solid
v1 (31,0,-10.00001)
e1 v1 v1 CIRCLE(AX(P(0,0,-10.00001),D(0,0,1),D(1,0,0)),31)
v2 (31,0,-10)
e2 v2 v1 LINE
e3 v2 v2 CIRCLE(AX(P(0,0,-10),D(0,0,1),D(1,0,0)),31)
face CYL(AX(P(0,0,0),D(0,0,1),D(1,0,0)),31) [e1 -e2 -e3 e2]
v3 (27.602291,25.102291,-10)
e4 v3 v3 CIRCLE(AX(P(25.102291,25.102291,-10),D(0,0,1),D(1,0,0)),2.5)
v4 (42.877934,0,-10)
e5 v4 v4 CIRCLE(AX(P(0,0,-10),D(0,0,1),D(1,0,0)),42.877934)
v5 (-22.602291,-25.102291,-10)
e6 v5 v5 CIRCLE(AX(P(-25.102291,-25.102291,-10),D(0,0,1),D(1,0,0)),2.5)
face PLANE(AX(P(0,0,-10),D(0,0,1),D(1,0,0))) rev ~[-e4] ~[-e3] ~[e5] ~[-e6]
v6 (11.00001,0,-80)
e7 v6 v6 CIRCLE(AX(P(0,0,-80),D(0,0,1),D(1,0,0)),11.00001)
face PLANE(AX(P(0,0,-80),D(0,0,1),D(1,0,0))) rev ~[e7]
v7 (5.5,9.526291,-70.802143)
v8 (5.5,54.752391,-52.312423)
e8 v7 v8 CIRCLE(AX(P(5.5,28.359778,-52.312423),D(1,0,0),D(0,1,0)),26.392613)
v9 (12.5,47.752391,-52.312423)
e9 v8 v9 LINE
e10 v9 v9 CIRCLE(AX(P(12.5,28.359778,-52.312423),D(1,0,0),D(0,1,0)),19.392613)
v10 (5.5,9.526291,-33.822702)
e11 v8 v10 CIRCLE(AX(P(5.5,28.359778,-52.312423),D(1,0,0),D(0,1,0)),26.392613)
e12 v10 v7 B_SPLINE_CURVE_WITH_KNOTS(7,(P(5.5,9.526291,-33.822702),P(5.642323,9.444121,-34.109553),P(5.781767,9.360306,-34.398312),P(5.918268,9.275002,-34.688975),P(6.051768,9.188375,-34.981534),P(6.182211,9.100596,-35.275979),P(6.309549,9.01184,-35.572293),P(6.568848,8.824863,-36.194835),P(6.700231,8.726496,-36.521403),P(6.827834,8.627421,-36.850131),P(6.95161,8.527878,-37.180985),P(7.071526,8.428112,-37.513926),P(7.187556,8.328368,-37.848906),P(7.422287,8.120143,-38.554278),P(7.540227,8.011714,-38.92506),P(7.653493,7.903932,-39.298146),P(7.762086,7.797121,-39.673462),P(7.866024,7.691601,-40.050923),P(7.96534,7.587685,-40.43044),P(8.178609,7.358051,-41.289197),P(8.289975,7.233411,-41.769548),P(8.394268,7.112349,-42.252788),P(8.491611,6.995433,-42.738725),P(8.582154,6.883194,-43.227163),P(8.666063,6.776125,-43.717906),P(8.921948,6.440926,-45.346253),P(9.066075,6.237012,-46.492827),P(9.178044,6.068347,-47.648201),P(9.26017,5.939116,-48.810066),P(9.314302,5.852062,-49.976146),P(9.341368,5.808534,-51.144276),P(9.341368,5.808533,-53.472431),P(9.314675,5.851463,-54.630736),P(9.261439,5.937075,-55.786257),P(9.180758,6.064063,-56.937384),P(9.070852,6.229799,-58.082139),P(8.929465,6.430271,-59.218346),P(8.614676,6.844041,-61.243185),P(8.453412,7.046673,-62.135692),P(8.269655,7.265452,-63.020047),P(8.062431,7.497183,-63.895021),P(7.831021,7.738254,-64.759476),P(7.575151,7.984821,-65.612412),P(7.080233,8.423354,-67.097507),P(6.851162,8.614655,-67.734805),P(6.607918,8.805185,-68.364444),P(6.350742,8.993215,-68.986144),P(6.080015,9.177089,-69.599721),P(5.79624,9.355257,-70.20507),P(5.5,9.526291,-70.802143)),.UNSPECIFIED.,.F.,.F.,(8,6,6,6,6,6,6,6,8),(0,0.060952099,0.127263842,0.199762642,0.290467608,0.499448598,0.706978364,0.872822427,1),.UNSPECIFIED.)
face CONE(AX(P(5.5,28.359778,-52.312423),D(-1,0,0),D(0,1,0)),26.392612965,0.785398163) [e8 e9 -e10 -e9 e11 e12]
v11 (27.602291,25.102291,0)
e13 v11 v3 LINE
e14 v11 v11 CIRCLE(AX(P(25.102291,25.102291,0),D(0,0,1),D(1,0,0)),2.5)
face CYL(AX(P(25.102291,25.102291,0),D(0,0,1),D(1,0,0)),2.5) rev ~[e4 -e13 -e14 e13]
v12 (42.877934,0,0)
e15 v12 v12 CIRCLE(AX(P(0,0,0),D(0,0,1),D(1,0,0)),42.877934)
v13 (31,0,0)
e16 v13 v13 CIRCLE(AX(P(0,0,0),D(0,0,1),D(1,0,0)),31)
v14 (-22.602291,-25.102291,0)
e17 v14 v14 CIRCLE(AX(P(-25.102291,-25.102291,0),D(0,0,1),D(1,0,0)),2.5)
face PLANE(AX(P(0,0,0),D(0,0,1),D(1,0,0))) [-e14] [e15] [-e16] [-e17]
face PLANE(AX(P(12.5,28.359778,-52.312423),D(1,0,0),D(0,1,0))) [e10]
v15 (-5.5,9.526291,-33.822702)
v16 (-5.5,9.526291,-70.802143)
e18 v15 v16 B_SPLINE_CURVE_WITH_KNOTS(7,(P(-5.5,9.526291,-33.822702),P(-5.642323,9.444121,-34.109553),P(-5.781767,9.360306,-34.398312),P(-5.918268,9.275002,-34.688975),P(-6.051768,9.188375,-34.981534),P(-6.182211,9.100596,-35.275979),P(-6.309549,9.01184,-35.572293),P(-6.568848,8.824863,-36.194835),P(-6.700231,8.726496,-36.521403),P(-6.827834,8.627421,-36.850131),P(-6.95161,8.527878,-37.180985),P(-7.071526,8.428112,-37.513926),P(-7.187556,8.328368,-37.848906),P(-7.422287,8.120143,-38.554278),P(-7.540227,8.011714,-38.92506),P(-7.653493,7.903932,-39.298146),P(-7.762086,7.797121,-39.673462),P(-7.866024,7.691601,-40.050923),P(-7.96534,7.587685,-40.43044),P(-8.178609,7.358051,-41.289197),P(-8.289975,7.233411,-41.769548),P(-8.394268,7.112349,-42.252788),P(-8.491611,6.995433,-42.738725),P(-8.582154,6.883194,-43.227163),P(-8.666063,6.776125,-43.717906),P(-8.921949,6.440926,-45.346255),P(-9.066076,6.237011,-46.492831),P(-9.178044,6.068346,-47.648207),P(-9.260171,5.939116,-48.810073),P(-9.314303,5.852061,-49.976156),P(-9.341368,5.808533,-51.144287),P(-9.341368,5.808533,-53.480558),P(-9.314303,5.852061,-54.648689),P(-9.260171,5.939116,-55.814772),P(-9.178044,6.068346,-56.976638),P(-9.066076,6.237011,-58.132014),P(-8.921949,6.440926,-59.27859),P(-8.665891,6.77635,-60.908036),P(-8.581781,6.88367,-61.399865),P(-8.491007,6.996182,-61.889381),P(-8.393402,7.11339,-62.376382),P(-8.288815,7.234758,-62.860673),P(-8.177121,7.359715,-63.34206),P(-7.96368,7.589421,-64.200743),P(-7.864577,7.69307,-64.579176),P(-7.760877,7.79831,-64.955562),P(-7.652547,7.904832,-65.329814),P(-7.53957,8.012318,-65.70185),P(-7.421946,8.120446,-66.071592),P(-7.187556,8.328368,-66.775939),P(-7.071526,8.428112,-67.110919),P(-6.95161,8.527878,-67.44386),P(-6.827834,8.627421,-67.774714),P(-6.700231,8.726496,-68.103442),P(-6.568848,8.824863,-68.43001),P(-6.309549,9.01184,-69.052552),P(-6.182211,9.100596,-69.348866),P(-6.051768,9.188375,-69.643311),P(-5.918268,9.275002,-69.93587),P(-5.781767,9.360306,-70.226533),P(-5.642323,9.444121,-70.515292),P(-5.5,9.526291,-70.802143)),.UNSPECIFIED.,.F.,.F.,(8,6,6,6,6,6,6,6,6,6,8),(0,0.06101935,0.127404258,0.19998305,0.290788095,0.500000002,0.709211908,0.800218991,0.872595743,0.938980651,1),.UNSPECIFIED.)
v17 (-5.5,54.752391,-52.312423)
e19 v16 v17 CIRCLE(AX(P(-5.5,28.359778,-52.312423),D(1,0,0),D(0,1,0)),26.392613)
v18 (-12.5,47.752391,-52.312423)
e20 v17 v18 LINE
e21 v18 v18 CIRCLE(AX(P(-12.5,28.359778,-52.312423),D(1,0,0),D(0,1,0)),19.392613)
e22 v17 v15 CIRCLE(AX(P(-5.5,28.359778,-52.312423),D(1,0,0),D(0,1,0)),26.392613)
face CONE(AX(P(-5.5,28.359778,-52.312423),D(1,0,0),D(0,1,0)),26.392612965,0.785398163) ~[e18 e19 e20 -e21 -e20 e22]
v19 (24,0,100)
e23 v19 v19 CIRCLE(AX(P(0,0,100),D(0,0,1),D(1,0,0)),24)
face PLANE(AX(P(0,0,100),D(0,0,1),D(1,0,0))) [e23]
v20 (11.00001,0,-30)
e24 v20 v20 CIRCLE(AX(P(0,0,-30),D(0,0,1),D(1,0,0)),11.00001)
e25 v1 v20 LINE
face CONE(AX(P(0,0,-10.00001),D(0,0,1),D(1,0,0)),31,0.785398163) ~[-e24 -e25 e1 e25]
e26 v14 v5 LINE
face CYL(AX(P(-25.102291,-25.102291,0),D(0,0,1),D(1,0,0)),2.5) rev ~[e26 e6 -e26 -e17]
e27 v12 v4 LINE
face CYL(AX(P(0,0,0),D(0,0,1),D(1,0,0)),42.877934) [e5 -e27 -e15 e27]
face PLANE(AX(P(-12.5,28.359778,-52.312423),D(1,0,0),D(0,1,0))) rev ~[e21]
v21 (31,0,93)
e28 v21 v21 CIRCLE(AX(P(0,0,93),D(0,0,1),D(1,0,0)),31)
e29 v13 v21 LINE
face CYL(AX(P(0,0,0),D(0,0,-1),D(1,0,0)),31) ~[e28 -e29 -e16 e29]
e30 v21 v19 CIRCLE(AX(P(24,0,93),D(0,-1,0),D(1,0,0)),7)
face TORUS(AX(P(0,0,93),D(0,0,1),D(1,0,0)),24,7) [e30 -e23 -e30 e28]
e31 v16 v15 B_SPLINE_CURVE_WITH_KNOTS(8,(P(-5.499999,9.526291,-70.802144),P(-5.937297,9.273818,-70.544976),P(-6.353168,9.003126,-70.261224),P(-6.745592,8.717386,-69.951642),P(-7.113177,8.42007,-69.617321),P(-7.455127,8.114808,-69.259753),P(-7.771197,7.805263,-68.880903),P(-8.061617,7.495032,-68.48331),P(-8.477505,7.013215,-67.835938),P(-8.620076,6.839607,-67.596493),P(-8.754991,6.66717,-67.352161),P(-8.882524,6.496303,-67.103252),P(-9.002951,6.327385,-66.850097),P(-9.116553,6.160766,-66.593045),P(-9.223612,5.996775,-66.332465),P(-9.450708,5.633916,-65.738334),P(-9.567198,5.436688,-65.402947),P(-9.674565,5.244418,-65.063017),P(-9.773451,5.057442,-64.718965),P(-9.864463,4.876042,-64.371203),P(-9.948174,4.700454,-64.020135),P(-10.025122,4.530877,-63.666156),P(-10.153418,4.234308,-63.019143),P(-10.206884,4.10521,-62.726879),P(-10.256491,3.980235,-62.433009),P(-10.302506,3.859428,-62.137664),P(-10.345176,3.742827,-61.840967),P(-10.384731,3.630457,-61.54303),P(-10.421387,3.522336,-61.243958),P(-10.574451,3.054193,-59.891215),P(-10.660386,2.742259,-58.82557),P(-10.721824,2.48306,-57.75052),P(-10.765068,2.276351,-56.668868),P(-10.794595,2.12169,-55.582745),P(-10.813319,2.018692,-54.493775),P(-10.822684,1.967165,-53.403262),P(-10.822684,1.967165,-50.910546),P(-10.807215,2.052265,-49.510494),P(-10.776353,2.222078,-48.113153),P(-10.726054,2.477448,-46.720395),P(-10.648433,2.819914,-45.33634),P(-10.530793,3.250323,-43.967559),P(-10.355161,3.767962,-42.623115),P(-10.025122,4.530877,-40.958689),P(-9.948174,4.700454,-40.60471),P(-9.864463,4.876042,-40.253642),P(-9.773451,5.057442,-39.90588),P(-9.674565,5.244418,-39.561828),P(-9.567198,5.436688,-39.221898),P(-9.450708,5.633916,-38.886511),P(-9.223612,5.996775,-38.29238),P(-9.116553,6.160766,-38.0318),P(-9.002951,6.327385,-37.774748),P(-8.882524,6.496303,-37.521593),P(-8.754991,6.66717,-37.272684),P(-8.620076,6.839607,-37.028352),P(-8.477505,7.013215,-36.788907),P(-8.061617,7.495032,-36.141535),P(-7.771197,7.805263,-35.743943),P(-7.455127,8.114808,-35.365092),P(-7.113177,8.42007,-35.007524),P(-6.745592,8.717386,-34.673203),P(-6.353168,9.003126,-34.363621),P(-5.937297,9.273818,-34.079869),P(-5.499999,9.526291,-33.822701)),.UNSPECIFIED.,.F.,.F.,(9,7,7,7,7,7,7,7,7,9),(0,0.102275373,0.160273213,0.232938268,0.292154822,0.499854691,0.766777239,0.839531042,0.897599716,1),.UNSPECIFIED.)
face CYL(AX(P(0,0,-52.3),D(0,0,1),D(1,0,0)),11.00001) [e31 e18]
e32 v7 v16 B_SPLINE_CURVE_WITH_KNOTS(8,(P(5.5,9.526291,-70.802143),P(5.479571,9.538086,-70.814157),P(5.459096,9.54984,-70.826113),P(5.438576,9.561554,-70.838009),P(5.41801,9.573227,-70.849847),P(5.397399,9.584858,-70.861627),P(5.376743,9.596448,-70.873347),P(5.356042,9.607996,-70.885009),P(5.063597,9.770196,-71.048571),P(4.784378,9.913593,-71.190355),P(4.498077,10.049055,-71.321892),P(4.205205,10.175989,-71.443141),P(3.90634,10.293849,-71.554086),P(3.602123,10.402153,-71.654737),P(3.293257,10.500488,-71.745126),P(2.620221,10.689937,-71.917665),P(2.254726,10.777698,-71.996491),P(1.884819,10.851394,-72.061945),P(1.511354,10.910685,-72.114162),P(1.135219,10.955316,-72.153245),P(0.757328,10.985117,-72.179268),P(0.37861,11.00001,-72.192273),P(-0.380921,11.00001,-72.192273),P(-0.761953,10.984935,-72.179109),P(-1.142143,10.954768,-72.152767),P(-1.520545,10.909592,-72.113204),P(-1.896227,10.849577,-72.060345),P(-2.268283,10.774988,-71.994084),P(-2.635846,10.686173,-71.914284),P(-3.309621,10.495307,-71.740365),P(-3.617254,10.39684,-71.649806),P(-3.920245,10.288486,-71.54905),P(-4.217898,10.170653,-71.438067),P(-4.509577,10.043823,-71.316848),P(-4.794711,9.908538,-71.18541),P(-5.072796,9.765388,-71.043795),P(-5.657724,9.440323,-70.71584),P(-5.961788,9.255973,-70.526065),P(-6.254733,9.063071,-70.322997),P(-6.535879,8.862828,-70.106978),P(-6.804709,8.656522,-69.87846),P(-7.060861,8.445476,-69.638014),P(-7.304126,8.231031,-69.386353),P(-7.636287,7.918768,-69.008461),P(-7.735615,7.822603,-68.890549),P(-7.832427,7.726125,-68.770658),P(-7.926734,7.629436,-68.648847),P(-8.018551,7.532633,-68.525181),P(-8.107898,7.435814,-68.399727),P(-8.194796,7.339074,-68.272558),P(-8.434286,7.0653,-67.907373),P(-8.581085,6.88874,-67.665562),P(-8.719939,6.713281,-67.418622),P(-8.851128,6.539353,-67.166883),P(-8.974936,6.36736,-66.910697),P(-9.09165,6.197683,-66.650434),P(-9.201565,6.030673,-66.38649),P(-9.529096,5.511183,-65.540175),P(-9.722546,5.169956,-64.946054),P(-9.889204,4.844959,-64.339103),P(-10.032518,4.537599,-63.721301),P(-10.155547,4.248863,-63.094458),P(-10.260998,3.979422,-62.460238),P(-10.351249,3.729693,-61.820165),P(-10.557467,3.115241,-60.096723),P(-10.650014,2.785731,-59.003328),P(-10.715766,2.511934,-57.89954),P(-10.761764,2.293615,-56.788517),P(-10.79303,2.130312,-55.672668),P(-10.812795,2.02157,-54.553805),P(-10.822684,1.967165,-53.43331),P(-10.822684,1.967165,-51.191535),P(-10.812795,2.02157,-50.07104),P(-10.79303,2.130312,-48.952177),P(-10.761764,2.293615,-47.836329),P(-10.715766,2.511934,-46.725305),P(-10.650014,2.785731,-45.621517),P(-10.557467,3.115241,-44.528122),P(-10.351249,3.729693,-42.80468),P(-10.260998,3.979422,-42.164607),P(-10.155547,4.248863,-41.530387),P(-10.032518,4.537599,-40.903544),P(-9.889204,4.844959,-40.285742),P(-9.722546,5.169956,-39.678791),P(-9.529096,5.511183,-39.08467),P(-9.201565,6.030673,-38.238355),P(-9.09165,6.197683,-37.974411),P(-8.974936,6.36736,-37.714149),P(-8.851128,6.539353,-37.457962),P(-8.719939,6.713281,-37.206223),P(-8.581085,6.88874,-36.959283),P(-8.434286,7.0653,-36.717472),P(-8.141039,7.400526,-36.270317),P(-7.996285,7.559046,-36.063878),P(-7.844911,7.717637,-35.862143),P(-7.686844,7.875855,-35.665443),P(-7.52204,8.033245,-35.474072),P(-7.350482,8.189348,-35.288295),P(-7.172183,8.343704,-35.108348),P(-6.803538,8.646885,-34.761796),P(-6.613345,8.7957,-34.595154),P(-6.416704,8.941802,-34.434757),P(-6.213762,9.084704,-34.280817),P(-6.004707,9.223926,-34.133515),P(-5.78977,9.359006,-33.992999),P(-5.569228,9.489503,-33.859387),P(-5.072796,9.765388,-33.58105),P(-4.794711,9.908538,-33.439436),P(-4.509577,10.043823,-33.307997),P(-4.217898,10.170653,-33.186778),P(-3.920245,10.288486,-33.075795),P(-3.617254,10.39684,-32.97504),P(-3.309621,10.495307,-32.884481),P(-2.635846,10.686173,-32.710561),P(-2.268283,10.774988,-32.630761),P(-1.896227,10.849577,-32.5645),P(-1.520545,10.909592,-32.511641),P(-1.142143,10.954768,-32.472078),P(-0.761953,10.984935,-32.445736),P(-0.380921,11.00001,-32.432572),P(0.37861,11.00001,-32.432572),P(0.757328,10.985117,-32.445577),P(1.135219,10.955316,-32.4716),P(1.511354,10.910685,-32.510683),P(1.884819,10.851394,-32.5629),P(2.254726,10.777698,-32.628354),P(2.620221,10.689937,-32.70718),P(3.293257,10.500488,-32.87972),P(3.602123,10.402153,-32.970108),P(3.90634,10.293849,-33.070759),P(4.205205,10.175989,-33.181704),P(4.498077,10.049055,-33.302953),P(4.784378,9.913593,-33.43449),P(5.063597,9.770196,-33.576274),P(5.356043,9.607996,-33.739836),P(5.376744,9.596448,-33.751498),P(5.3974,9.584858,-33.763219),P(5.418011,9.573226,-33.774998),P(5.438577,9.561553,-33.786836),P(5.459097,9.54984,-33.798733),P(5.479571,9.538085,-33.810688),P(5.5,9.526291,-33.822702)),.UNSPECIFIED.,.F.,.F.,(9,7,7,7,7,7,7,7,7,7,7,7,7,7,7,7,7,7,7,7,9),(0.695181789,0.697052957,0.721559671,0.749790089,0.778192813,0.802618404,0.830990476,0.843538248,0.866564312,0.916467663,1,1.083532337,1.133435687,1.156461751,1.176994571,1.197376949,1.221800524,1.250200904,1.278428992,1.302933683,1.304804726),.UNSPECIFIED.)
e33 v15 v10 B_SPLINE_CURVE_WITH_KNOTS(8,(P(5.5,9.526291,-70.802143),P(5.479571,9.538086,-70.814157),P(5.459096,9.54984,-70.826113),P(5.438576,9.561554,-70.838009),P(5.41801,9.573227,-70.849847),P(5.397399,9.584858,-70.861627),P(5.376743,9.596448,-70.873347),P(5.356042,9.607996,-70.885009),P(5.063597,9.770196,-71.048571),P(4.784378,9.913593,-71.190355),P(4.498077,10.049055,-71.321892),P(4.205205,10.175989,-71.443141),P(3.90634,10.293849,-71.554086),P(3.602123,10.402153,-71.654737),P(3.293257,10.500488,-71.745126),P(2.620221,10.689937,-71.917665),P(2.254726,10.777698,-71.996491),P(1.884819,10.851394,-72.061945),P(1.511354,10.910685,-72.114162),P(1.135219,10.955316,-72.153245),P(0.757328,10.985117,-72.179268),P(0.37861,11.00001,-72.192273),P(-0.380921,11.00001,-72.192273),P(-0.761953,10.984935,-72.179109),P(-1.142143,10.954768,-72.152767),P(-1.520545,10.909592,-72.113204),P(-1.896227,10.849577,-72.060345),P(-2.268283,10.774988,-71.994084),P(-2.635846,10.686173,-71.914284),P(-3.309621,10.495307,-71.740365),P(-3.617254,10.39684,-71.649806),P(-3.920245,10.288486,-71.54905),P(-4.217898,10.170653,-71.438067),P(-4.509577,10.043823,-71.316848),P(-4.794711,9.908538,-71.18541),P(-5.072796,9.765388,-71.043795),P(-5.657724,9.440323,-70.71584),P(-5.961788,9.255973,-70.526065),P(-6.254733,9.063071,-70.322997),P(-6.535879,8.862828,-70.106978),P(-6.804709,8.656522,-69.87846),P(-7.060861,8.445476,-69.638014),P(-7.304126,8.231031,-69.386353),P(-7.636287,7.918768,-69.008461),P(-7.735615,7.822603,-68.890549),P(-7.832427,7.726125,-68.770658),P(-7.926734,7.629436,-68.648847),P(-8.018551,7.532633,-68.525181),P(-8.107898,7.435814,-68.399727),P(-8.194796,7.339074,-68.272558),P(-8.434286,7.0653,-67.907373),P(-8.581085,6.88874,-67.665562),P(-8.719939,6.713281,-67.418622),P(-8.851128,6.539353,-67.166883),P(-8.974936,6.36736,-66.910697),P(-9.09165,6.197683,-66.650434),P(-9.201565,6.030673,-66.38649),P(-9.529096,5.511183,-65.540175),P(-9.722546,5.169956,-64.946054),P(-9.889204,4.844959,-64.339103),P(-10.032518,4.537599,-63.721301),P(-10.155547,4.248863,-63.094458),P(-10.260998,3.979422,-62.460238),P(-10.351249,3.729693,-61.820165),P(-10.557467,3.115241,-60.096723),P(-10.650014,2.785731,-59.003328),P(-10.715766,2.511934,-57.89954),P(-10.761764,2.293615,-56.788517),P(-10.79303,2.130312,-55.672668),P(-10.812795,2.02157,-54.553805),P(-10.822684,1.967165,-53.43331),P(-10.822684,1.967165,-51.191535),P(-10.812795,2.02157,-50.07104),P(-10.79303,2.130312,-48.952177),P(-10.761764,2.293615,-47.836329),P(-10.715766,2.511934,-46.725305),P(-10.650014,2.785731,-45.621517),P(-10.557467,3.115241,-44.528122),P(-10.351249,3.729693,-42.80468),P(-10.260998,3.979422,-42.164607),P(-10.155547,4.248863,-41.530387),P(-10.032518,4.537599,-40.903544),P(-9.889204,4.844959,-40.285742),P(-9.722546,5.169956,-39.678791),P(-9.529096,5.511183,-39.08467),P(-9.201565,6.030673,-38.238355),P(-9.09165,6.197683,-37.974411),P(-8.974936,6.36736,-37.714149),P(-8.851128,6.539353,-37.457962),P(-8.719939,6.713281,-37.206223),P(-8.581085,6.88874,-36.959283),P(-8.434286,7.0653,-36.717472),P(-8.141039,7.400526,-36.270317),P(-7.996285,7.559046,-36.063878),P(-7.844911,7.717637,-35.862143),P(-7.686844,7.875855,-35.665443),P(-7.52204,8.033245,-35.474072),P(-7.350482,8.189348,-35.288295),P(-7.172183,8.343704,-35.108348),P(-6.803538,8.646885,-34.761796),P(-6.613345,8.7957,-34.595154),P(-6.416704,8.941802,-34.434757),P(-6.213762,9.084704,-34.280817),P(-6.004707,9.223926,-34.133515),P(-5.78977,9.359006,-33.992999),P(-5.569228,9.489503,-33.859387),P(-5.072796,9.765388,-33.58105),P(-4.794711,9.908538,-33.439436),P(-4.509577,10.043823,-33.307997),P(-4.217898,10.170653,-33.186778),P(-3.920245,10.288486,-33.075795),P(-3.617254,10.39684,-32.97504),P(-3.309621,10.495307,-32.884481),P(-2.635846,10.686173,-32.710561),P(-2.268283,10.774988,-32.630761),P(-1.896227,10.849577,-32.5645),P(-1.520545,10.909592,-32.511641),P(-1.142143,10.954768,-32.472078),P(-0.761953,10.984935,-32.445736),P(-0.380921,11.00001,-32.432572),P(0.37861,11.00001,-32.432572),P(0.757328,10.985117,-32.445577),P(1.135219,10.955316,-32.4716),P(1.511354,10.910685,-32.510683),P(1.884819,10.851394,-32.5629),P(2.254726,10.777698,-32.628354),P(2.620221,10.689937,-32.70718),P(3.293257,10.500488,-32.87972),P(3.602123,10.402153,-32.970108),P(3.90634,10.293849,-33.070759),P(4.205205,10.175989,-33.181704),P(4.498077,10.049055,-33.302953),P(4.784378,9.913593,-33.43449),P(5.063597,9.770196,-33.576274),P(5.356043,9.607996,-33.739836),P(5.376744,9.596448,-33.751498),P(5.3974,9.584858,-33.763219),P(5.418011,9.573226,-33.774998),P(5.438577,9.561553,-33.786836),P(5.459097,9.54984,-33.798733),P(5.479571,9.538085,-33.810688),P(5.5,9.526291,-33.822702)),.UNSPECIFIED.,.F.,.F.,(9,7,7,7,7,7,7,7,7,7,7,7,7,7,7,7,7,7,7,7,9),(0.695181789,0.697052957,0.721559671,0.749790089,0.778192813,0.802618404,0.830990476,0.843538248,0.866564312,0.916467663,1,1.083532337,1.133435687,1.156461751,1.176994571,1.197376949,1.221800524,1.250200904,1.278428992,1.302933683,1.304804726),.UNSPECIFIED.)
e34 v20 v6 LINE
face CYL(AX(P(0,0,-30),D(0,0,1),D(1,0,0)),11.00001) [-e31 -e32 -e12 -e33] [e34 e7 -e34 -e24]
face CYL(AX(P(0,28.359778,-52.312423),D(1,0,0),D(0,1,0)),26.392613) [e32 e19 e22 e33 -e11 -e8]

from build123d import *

# Parameters (mm, degrees)
F0_R          = 31
F0_R_2        = 11.0794827648
F1_DEPTH      = 100
F2_R          = 7
F0_R_3        = 42.8779340108
F0_R_4        = 2.5
F3_DEPTH      = 10
F4_DEPTH      = 30
F5_DEPTH      = 30
F6_SIZE       = 19.99999
F7_DEPTH      = 50
F8_R          = 26.3926129655
F9_DEPTH      = 12.5
F10_S5_R      = 11.00001
F10_T6_DEPTH  = 39
F10_S11_R     = 11.00001
F10_T12_DEPTH = 39


# Not quite as in the source:
# - a fillet or chamfer that OpenCascade refuses, or shapes differently, is made with other operations: its cross-section is extruded or revolved along the edge and cut away or added
# - a fillet or chamfer is up to 0.001 mm smaller than in the source, because OpenCascade refuses the exact size


with BuildPart() as f1:
    # F0 (on Top) → F1 (new body)
    with BuildSketch(Plane.XY):
        Circle(F0_R)
        Circle(F0_R_2, mode=Mode.SUBTRACT)
        Circle(F0_R_2)
    extrude(amount=F1_DEPTH)

    # F2
    f2_edges = [f1.edges().sort_by_distance(p)[0] for p in [
        (-31, 0, 100),
    ]]
    fillet(f2_edges, radius=F2_R)

    # F0 (on Top) → F3 (join)
    with BuildSketch(Plane.XY):
        Circle(F0_R_3)
        with Locations((-25.1022907321, -25.1022907321)):
            Circle(F0_R_4, mode=Mode.SUBTRACT)
        Circle(F0_R, mode=Mode.SUBTRACT)
        with Locations((25.1022907321, 25.1022907321)):
            Circle(F0_R_4, mode=Mode.SUBTRACT)
    extrude(amount=-F3_DEPTH)

    # F0 (on Top) → F4 (join)
    with BuildSketch(Plane.XY):
        Circle(F0_R_2)
    extrude(amount=-F4_DEPTH)

    # F0 (on Top) → F5 (join)
    with BuildSketch(Plane.XY):
        Circle(F0_R)
        Circle(F0_R_2, mode=Mode.SUBTRACT)
    extrude(amount=-F5_DEPTH)

    # F6 (size 20 in the source; OpenCascade refuses exactly that, so slightly less here)
    f6_edges = [f1.edges().sort_by_distance(p)[0] for p in [
        (-31, 0, -30),
    ]]
    chamfer(f6_edges, length=F6_SIZE)

    # F7 (add): a face of the model
    f7_faces = [f1.faces().sort_by_distance(p)[0] for p in [
        (0, 0, -30),
    ]]
    extrude(f7_faces, amount=F7_DEPTH)

    # F8 (on Right) → F9 (join, symmetric)
    with BuildSketch(Plane.YZ):
        with Locations((28.3597782254, -52.3124225438)):
            Circle(F8_R)
    extrude(amount=F9_DEPTH, both=True)

    # F10: chamfer of 7 on 2 edges, made by hand


with BuildPart() as f10_tool2:
    # F10_s3 → F10_t4 (revolve)
    with BuildSketch(Plane.XY.offset(-52.3124225438)):
        Polygon((5.5, 54.7523911909), (12.5, 47.7523911909), (12.5, 54.7523911909), align=None)
    revolve(axis=Axis((12.5, 28.3597782254, -52.3124225438), (1, 0, 0)))

    # F10_s5 → F10_t6 (cut, symmetric)
    with BuildSketch(Plane.XY.offset(-52.3)):
        Circle(F10_S5_R)
    extrude(amount=F10_T6_DEPTH, both=True, mode=Mode.SUBTRACT)


with BuildPart() as f1_1:
    add(f1.part)

    # F10_t1: cut F10_tool2
    add(f10_tool2.part, mode=Mode.SUBTRACT)


with BuildPart() as f10_tool8:
    # F10_s9 → F10_t10 (revolve)
    with BuildSketch(Plane.XY.offset(-52.3124225438)):
        Polygon((-5.5, 54.7523911909), (-12.5, 47.7523911909), (-12.5, 54.7523911909), align=None)
    revolve(axis=Axis((-12.5, 28.3597782254, -52.3124225438), (1, 0, 0)))

    # F10_s11 → F10_t12 (cut, symmetric)
    with BuildSketch(Plane.XY.offset(-52.3)):
        Circle(F10_S11_R)
    extrude(amount=F10_T12_DEPTH, both=True, mode=Mode.SUBTRACT)


with BuildPart() as f1_2:
    add(f1_1.part)

    # F10_t7: cut F10_tool8
    add(f10_tool8.part, mode=Mode.SUBTRACT)


solid = f1_2.part
